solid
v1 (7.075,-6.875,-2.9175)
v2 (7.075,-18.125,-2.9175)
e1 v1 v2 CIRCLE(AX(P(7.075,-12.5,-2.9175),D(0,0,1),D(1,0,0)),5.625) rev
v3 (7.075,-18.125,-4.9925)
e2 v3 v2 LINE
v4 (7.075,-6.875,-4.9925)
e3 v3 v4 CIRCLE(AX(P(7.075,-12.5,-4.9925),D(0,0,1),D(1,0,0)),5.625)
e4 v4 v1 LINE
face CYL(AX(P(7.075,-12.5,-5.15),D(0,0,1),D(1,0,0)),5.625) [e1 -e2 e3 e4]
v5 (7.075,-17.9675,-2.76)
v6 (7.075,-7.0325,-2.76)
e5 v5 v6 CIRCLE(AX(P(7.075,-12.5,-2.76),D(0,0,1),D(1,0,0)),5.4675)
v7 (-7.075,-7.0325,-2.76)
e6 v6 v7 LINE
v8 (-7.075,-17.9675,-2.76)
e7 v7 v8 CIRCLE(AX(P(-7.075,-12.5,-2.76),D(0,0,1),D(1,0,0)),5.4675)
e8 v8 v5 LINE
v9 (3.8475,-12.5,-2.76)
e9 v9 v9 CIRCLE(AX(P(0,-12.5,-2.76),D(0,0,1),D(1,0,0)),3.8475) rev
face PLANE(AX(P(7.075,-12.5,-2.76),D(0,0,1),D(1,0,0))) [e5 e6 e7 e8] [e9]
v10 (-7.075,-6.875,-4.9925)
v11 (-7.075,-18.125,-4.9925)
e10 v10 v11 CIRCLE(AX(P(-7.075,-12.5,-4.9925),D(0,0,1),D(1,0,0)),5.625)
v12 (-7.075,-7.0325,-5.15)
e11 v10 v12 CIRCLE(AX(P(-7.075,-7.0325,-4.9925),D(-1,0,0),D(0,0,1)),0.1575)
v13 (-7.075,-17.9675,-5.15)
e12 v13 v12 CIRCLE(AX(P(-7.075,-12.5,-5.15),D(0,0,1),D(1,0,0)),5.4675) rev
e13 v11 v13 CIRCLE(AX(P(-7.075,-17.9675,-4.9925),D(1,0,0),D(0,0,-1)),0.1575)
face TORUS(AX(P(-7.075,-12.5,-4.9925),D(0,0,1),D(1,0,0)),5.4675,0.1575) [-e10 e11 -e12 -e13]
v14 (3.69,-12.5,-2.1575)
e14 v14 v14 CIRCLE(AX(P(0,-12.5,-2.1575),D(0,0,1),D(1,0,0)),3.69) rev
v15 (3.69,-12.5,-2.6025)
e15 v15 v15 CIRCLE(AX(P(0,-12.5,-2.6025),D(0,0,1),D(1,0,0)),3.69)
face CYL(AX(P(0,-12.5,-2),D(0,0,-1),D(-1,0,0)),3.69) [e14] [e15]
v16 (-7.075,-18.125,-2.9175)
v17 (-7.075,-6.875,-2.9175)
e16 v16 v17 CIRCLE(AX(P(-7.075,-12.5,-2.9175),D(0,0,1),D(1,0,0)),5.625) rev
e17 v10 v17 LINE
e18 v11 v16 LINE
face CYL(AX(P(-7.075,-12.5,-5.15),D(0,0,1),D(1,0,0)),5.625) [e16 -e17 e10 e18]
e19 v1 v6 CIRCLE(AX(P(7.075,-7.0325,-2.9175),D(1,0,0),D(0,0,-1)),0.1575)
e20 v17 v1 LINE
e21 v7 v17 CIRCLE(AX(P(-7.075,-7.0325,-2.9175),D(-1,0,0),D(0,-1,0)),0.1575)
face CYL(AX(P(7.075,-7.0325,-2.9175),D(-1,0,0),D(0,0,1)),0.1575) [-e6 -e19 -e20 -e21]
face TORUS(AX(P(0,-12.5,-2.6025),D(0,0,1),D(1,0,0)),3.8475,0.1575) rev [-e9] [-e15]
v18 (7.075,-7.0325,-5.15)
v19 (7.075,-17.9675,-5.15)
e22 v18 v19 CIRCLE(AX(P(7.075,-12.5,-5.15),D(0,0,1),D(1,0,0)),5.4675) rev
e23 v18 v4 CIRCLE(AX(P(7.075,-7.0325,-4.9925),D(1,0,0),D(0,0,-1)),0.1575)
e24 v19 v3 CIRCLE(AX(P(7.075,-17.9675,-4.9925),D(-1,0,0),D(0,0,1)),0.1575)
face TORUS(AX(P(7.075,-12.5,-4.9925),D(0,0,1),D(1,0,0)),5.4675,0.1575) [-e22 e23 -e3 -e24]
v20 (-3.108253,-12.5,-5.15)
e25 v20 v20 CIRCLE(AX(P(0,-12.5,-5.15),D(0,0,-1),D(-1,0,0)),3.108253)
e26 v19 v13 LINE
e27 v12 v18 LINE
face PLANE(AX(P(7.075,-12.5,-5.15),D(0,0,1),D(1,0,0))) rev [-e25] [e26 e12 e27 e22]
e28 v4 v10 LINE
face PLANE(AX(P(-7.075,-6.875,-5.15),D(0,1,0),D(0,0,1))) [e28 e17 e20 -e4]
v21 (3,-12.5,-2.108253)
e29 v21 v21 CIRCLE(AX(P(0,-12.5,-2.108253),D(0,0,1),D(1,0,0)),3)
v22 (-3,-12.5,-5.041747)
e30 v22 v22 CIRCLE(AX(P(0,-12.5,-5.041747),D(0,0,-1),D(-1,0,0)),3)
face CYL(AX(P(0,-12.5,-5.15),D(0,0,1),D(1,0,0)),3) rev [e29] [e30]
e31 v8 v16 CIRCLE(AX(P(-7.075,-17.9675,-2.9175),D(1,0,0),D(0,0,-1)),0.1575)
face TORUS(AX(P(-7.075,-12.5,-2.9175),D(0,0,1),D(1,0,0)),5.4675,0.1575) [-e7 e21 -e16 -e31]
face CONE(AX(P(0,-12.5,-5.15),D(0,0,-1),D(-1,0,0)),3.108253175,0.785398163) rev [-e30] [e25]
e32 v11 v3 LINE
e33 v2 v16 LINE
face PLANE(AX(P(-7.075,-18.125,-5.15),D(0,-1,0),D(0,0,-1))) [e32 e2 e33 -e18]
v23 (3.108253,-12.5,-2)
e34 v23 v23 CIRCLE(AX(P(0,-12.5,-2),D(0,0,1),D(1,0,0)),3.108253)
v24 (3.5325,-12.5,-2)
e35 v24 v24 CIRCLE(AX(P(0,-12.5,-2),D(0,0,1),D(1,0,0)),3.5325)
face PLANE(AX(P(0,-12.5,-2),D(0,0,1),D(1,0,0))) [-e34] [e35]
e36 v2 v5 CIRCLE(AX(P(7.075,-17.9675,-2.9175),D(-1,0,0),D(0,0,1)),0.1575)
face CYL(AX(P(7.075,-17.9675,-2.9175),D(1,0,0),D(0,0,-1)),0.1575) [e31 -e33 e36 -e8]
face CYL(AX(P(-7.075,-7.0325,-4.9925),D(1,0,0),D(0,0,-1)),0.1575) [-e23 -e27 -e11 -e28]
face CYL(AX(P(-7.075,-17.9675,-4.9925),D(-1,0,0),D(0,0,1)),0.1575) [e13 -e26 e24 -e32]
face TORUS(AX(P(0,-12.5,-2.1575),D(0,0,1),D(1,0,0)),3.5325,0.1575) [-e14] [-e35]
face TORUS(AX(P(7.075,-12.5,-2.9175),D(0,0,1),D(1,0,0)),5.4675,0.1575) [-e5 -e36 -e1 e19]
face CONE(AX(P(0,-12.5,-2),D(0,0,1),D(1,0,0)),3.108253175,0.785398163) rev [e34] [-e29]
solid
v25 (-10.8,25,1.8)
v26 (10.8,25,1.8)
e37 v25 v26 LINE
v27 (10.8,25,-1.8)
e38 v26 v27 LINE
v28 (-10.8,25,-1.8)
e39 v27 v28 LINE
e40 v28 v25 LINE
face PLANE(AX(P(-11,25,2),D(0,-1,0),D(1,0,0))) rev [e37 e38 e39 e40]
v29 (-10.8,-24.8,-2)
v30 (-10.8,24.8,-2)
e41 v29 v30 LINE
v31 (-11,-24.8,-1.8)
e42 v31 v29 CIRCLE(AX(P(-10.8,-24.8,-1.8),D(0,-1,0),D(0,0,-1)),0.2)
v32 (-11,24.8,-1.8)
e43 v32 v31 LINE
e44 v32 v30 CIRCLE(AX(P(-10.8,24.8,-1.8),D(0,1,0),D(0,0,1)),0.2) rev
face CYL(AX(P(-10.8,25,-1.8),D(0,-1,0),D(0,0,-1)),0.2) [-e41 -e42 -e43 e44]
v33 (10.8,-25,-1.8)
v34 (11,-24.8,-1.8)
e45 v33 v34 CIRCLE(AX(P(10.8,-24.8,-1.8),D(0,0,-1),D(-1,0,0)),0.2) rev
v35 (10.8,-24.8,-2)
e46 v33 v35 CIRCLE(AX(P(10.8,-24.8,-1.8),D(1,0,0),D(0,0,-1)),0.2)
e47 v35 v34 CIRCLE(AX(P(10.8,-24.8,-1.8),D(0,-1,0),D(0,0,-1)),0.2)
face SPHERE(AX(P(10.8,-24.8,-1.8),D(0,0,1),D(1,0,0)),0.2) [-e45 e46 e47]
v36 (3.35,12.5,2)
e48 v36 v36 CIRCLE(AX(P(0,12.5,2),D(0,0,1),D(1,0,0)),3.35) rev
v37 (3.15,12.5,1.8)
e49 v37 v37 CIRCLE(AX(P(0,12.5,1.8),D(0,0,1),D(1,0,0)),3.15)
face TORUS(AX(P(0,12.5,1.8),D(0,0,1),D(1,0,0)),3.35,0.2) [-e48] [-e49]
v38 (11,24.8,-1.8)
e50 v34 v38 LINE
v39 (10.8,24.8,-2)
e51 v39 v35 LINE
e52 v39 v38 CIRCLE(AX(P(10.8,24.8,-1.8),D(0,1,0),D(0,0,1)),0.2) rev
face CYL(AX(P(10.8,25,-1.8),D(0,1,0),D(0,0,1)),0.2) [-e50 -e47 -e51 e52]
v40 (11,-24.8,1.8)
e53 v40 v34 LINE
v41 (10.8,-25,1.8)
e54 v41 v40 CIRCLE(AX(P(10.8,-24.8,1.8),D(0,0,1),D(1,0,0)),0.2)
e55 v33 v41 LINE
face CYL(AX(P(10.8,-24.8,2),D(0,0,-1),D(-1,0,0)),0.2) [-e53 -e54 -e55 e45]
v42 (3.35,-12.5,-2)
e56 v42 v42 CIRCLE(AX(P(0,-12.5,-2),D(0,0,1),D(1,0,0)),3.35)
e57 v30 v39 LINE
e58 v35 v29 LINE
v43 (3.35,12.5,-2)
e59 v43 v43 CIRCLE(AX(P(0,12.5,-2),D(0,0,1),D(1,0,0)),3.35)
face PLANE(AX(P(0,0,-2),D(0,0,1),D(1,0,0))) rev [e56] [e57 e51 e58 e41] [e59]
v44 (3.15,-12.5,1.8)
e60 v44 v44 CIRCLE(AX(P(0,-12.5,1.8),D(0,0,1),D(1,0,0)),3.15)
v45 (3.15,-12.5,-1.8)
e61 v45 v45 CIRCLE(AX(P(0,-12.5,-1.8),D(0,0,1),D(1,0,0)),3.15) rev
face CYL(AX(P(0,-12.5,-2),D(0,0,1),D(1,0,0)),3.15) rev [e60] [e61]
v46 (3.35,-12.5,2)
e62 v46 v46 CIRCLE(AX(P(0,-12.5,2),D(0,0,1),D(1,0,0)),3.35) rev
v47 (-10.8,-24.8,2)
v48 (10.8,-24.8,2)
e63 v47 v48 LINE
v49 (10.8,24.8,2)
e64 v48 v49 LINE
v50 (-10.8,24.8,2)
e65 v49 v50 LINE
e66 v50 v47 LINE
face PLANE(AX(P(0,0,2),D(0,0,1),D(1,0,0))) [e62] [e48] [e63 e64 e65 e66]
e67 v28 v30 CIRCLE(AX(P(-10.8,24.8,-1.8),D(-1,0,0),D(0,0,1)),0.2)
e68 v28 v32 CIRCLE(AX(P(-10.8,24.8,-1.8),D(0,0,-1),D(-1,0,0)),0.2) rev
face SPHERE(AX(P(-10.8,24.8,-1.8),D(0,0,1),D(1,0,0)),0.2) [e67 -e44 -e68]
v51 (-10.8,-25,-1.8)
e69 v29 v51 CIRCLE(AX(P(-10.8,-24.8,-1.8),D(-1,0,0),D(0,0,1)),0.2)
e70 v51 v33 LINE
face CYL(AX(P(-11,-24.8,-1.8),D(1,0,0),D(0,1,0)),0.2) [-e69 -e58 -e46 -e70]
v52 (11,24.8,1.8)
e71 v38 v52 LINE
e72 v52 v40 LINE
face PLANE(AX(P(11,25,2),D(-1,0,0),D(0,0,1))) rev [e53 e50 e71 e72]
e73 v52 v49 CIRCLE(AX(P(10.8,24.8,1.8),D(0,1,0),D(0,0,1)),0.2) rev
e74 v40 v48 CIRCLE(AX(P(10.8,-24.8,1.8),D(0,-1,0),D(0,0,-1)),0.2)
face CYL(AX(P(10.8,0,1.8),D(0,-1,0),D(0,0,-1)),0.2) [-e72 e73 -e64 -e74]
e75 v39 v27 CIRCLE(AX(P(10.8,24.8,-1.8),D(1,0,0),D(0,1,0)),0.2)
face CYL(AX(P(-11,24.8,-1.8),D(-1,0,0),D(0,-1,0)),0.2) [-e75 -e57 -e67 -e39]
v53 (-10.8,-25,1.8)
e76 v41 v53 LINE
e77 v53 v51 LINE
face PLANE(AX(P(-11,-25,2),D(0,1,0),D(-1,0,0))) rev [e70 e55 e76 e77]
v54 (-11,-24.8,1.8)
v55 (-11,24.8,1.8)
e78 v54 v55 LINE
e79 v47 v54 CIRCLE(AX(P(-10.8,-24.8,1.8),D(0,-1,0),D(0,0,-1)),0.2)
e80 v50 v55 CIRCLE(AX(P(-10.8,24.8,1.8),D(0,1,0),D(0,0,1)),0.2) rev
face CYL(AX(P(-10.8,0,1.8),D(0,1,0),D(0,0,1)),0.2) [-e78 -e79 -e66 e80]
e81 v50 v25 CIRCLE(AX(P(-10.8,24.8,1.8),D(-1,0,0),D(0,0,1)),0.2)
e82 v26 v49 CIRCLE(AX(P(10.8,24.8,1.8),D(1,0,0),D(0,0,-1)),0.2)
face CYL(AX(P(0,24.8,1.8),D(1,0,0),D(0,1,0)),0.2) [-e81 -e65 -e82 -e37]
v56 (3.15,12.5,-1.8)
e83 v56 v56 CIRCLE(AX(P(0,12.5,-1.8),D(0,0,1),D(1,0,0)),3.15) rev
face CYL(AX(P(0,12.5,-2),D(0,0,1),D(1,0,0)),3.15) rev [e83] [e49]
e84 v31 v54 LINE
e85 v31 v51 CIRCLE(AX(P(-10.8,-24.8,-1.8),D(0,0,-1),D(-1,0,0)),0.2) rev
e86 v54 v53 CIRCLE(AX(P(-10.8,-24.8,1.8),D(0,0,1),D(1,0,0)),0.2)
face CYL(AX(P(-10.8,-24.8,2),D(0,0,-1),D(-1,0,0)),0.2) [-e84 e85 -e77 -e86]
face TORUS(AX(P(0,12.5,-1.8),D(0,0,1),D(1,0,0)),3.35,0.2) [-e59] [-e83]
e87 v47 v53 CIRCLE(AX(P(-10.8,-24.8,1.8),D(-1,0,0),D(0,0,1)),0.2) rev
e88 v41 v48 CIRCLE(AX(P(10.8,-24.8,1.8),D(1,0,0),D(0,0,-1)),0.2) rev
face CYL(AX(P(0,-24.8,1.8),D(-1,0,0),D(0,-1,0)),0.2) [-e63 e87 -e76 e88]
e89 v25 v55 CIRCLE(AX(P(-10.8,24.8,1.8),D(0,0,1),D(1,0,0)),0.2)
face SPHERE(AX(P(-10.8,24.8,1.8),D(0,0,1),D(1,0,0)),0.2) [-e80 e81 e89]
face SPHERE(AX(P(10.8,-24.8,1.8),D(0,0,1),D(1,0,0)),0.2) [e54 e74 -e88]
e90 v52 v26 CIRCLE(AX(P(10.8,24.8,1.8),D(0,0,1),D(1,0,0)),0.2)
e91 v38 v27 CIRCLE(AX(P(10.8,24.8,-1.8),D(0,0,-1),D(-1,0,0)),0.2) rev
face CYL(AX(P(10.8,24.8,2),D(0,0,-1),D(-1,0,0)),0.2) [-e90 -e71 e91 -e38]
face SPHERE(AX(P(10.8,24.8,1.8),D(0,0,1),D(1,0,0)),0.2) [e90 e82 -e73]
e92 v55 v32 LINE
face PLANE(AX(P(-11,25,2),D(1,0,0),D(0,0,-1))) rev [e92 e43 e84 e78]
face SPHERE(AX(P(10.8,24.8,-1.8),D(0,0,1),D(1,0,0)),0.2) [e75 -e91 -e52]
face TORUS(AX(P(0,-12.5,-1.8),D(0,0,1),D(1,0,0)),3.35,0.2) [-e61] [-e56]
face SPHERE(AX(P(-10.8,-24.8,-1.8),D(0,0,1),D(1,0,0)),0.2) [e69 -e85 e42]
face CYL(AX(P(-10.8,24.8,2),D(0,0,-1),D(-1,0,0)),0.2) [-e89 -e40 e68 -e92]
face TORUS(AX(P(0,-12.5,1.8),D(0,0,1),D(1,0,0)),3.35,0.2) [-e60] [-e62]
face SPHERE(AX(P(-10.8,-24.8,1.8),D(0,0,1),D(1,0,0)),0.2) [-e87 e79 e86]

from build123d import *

# Parameters (mm, degrees)
BOSS_EXTRUDE1_DEPTH      = 2
BOSS_EXTRUDE1_DEPTH_BACK = 2
SKETCH3_W                = 22
SKETCH3_H                = 50
SKETCH16_R               = 3.15
CUT_EXTRUDE5_DEPTH       = 28.604347484
FILLET1_R                = 0.2
BOSS_EXTRUDE2_START      = -2.76
SKETCH4_R                = 3
BOSS_EXTRUDE2_DEPTH      = 2.39
SKETCH5_R                = 3.69
SKETCH5_R_2              = 3
BOSS_EXTRUDE3_DEPTH      = 0.76
FILLET2_R                = 0.1575


# Read off the part's stored shape, not the designer's step: Cut-Extrude3, Cut-Extrude4
with BuildPart() as part:
    # Sketch3 → Boss-Extrude1 (new, two sides: drawn at the far end of the back side and taken through both)
    with BuildSketch(Plane.XY.offset(-BOSS_EXTRUDE1_DEPTH_BACK)):
        Rectangle(SKETCH3_W, SKETCH3_H)
    extrude(amount=BOSS_EXTRUDE1_DEPTH + BOSS_EXTRUDE1_DEPTH_BACK)

    # Sketch16 → Cut-Extrude5 (cut, through all)
    with BuildSketch(Plane.XY.offset(2)):
        with Locations((0, -12.5)):
            Circle(SKETCH16_R)
        with Locations((0, 12.5)):
            Circle(SKETCH16_R)
    extrude(amount=-CUT_EXTRUDE5_DEPTH, mode=Mode.SUBTRACT)

    # Fillet1
    fillet1_edges = [part.edges().sort_by_distance(p)[0] for p in [
        (11, 0, 2),
        (-11, 0, -2),
        (0, 25, -2),
        (11, 0, -2),
        (0, -25, -2),
        (0, 25, 2),
        (-3.15, -12.5, -2),
        (-3.15, -12.5, 2),
        (-3.15, 12.5, -2),
        (-3.15, 12.5, 2),
        (-11, 0, 2),
        (0, -25, 2),
        (-11, 25, 0),
        (11, 25, 0),
        (11, -25, 0),
        (-11, -25, 0),
    ]]
    fillet(fillet1_edges, radius=FILLET1_R)


with BuildPart() as body_2:
    # Sketch4 → Boss-Extrude2 (new body)
    with BuildSketch(Plane.XY.offset(BOSS_EXTRUDE2_START)):
        with BuildLine():
            Line((-7.075, -18.125), (7.075, -18.125))
            ThreePointArc((7.075, -18.125), (12.7, -12.5), (7.075, -6.875))
            Line((7.075, -6.875), (-7.075, -6.875))
            ThreePointArc((-7.075, -6.875), (-12.7, -12.5), (-7.075, -18.125))
        make_face()
        with Locations((0, -12.5)):
            Circle(SKETCH4_R, mode=Mode.SUBTRACT)
    extrude(amount=-BOSS_EXTRUDE2_DEPTH)

    # Sketch5 → Boss-Extrude3 (add)
    with BuildSketch(Plane.XY.offset(-2.76)):
        with Locations((0, -12.5)):
            Circle(SKETCH5_R)
        with Locations((0, -12.5)):
            Circle(SKETCH5_R_2, mode=Mode.SUBTRACT)
    extrude(amount=BOSS_EXTRUDE3_DEPTH)

    # Fillet2
    fillet2_edges = [body_2.edges().sort_by_distance(p)[0] for p in [
        (-12.7, -12.5, -5.15),
        (0, -18.125, -5.15),
        (-3.69, -12.5, -2),
        (-3.69, -12.5, -2.76),
        (12.7, -12.5, -5.15),
        (0, -18.125, -2.76),
        (-12.7, -12.5, -2.76),
        (0, -6.875, -2.76),
        (12.7, -12.5, -2.76),
        (0, -6.875, -5.15),
    ]]
    fillet(fillet2_edges, radius=FILLET2_R)

    # Cut-Extrude3 outline → Cut-Extrude3 (revolve, cut)
    with BuildSketch(Plane.XZ.offset(12.5)):
        Polygon((3, -2), (3, -2.108253175), (3.108253175, -2), align=None)
    revolve(axis=Axis((0, -12.5, 0), (0, 0, 1)), mode=Mode.SUBTRACT)

    # Cut-Extrude4 outline → Cut-Extrude4 (revolve, cut)
    with BuildSketch(Plane.XZ.offset(12.5)):
        Polygon((3.108253175, -5.15), (3, -5.041746825), (3, -5.15), align=None)
    revolve(axis=Axis((0, -12.5, 0), (0, 0, 1)), mode=Mode.SUBTRACT)


solid = Compound([part.part, body_2.part])
